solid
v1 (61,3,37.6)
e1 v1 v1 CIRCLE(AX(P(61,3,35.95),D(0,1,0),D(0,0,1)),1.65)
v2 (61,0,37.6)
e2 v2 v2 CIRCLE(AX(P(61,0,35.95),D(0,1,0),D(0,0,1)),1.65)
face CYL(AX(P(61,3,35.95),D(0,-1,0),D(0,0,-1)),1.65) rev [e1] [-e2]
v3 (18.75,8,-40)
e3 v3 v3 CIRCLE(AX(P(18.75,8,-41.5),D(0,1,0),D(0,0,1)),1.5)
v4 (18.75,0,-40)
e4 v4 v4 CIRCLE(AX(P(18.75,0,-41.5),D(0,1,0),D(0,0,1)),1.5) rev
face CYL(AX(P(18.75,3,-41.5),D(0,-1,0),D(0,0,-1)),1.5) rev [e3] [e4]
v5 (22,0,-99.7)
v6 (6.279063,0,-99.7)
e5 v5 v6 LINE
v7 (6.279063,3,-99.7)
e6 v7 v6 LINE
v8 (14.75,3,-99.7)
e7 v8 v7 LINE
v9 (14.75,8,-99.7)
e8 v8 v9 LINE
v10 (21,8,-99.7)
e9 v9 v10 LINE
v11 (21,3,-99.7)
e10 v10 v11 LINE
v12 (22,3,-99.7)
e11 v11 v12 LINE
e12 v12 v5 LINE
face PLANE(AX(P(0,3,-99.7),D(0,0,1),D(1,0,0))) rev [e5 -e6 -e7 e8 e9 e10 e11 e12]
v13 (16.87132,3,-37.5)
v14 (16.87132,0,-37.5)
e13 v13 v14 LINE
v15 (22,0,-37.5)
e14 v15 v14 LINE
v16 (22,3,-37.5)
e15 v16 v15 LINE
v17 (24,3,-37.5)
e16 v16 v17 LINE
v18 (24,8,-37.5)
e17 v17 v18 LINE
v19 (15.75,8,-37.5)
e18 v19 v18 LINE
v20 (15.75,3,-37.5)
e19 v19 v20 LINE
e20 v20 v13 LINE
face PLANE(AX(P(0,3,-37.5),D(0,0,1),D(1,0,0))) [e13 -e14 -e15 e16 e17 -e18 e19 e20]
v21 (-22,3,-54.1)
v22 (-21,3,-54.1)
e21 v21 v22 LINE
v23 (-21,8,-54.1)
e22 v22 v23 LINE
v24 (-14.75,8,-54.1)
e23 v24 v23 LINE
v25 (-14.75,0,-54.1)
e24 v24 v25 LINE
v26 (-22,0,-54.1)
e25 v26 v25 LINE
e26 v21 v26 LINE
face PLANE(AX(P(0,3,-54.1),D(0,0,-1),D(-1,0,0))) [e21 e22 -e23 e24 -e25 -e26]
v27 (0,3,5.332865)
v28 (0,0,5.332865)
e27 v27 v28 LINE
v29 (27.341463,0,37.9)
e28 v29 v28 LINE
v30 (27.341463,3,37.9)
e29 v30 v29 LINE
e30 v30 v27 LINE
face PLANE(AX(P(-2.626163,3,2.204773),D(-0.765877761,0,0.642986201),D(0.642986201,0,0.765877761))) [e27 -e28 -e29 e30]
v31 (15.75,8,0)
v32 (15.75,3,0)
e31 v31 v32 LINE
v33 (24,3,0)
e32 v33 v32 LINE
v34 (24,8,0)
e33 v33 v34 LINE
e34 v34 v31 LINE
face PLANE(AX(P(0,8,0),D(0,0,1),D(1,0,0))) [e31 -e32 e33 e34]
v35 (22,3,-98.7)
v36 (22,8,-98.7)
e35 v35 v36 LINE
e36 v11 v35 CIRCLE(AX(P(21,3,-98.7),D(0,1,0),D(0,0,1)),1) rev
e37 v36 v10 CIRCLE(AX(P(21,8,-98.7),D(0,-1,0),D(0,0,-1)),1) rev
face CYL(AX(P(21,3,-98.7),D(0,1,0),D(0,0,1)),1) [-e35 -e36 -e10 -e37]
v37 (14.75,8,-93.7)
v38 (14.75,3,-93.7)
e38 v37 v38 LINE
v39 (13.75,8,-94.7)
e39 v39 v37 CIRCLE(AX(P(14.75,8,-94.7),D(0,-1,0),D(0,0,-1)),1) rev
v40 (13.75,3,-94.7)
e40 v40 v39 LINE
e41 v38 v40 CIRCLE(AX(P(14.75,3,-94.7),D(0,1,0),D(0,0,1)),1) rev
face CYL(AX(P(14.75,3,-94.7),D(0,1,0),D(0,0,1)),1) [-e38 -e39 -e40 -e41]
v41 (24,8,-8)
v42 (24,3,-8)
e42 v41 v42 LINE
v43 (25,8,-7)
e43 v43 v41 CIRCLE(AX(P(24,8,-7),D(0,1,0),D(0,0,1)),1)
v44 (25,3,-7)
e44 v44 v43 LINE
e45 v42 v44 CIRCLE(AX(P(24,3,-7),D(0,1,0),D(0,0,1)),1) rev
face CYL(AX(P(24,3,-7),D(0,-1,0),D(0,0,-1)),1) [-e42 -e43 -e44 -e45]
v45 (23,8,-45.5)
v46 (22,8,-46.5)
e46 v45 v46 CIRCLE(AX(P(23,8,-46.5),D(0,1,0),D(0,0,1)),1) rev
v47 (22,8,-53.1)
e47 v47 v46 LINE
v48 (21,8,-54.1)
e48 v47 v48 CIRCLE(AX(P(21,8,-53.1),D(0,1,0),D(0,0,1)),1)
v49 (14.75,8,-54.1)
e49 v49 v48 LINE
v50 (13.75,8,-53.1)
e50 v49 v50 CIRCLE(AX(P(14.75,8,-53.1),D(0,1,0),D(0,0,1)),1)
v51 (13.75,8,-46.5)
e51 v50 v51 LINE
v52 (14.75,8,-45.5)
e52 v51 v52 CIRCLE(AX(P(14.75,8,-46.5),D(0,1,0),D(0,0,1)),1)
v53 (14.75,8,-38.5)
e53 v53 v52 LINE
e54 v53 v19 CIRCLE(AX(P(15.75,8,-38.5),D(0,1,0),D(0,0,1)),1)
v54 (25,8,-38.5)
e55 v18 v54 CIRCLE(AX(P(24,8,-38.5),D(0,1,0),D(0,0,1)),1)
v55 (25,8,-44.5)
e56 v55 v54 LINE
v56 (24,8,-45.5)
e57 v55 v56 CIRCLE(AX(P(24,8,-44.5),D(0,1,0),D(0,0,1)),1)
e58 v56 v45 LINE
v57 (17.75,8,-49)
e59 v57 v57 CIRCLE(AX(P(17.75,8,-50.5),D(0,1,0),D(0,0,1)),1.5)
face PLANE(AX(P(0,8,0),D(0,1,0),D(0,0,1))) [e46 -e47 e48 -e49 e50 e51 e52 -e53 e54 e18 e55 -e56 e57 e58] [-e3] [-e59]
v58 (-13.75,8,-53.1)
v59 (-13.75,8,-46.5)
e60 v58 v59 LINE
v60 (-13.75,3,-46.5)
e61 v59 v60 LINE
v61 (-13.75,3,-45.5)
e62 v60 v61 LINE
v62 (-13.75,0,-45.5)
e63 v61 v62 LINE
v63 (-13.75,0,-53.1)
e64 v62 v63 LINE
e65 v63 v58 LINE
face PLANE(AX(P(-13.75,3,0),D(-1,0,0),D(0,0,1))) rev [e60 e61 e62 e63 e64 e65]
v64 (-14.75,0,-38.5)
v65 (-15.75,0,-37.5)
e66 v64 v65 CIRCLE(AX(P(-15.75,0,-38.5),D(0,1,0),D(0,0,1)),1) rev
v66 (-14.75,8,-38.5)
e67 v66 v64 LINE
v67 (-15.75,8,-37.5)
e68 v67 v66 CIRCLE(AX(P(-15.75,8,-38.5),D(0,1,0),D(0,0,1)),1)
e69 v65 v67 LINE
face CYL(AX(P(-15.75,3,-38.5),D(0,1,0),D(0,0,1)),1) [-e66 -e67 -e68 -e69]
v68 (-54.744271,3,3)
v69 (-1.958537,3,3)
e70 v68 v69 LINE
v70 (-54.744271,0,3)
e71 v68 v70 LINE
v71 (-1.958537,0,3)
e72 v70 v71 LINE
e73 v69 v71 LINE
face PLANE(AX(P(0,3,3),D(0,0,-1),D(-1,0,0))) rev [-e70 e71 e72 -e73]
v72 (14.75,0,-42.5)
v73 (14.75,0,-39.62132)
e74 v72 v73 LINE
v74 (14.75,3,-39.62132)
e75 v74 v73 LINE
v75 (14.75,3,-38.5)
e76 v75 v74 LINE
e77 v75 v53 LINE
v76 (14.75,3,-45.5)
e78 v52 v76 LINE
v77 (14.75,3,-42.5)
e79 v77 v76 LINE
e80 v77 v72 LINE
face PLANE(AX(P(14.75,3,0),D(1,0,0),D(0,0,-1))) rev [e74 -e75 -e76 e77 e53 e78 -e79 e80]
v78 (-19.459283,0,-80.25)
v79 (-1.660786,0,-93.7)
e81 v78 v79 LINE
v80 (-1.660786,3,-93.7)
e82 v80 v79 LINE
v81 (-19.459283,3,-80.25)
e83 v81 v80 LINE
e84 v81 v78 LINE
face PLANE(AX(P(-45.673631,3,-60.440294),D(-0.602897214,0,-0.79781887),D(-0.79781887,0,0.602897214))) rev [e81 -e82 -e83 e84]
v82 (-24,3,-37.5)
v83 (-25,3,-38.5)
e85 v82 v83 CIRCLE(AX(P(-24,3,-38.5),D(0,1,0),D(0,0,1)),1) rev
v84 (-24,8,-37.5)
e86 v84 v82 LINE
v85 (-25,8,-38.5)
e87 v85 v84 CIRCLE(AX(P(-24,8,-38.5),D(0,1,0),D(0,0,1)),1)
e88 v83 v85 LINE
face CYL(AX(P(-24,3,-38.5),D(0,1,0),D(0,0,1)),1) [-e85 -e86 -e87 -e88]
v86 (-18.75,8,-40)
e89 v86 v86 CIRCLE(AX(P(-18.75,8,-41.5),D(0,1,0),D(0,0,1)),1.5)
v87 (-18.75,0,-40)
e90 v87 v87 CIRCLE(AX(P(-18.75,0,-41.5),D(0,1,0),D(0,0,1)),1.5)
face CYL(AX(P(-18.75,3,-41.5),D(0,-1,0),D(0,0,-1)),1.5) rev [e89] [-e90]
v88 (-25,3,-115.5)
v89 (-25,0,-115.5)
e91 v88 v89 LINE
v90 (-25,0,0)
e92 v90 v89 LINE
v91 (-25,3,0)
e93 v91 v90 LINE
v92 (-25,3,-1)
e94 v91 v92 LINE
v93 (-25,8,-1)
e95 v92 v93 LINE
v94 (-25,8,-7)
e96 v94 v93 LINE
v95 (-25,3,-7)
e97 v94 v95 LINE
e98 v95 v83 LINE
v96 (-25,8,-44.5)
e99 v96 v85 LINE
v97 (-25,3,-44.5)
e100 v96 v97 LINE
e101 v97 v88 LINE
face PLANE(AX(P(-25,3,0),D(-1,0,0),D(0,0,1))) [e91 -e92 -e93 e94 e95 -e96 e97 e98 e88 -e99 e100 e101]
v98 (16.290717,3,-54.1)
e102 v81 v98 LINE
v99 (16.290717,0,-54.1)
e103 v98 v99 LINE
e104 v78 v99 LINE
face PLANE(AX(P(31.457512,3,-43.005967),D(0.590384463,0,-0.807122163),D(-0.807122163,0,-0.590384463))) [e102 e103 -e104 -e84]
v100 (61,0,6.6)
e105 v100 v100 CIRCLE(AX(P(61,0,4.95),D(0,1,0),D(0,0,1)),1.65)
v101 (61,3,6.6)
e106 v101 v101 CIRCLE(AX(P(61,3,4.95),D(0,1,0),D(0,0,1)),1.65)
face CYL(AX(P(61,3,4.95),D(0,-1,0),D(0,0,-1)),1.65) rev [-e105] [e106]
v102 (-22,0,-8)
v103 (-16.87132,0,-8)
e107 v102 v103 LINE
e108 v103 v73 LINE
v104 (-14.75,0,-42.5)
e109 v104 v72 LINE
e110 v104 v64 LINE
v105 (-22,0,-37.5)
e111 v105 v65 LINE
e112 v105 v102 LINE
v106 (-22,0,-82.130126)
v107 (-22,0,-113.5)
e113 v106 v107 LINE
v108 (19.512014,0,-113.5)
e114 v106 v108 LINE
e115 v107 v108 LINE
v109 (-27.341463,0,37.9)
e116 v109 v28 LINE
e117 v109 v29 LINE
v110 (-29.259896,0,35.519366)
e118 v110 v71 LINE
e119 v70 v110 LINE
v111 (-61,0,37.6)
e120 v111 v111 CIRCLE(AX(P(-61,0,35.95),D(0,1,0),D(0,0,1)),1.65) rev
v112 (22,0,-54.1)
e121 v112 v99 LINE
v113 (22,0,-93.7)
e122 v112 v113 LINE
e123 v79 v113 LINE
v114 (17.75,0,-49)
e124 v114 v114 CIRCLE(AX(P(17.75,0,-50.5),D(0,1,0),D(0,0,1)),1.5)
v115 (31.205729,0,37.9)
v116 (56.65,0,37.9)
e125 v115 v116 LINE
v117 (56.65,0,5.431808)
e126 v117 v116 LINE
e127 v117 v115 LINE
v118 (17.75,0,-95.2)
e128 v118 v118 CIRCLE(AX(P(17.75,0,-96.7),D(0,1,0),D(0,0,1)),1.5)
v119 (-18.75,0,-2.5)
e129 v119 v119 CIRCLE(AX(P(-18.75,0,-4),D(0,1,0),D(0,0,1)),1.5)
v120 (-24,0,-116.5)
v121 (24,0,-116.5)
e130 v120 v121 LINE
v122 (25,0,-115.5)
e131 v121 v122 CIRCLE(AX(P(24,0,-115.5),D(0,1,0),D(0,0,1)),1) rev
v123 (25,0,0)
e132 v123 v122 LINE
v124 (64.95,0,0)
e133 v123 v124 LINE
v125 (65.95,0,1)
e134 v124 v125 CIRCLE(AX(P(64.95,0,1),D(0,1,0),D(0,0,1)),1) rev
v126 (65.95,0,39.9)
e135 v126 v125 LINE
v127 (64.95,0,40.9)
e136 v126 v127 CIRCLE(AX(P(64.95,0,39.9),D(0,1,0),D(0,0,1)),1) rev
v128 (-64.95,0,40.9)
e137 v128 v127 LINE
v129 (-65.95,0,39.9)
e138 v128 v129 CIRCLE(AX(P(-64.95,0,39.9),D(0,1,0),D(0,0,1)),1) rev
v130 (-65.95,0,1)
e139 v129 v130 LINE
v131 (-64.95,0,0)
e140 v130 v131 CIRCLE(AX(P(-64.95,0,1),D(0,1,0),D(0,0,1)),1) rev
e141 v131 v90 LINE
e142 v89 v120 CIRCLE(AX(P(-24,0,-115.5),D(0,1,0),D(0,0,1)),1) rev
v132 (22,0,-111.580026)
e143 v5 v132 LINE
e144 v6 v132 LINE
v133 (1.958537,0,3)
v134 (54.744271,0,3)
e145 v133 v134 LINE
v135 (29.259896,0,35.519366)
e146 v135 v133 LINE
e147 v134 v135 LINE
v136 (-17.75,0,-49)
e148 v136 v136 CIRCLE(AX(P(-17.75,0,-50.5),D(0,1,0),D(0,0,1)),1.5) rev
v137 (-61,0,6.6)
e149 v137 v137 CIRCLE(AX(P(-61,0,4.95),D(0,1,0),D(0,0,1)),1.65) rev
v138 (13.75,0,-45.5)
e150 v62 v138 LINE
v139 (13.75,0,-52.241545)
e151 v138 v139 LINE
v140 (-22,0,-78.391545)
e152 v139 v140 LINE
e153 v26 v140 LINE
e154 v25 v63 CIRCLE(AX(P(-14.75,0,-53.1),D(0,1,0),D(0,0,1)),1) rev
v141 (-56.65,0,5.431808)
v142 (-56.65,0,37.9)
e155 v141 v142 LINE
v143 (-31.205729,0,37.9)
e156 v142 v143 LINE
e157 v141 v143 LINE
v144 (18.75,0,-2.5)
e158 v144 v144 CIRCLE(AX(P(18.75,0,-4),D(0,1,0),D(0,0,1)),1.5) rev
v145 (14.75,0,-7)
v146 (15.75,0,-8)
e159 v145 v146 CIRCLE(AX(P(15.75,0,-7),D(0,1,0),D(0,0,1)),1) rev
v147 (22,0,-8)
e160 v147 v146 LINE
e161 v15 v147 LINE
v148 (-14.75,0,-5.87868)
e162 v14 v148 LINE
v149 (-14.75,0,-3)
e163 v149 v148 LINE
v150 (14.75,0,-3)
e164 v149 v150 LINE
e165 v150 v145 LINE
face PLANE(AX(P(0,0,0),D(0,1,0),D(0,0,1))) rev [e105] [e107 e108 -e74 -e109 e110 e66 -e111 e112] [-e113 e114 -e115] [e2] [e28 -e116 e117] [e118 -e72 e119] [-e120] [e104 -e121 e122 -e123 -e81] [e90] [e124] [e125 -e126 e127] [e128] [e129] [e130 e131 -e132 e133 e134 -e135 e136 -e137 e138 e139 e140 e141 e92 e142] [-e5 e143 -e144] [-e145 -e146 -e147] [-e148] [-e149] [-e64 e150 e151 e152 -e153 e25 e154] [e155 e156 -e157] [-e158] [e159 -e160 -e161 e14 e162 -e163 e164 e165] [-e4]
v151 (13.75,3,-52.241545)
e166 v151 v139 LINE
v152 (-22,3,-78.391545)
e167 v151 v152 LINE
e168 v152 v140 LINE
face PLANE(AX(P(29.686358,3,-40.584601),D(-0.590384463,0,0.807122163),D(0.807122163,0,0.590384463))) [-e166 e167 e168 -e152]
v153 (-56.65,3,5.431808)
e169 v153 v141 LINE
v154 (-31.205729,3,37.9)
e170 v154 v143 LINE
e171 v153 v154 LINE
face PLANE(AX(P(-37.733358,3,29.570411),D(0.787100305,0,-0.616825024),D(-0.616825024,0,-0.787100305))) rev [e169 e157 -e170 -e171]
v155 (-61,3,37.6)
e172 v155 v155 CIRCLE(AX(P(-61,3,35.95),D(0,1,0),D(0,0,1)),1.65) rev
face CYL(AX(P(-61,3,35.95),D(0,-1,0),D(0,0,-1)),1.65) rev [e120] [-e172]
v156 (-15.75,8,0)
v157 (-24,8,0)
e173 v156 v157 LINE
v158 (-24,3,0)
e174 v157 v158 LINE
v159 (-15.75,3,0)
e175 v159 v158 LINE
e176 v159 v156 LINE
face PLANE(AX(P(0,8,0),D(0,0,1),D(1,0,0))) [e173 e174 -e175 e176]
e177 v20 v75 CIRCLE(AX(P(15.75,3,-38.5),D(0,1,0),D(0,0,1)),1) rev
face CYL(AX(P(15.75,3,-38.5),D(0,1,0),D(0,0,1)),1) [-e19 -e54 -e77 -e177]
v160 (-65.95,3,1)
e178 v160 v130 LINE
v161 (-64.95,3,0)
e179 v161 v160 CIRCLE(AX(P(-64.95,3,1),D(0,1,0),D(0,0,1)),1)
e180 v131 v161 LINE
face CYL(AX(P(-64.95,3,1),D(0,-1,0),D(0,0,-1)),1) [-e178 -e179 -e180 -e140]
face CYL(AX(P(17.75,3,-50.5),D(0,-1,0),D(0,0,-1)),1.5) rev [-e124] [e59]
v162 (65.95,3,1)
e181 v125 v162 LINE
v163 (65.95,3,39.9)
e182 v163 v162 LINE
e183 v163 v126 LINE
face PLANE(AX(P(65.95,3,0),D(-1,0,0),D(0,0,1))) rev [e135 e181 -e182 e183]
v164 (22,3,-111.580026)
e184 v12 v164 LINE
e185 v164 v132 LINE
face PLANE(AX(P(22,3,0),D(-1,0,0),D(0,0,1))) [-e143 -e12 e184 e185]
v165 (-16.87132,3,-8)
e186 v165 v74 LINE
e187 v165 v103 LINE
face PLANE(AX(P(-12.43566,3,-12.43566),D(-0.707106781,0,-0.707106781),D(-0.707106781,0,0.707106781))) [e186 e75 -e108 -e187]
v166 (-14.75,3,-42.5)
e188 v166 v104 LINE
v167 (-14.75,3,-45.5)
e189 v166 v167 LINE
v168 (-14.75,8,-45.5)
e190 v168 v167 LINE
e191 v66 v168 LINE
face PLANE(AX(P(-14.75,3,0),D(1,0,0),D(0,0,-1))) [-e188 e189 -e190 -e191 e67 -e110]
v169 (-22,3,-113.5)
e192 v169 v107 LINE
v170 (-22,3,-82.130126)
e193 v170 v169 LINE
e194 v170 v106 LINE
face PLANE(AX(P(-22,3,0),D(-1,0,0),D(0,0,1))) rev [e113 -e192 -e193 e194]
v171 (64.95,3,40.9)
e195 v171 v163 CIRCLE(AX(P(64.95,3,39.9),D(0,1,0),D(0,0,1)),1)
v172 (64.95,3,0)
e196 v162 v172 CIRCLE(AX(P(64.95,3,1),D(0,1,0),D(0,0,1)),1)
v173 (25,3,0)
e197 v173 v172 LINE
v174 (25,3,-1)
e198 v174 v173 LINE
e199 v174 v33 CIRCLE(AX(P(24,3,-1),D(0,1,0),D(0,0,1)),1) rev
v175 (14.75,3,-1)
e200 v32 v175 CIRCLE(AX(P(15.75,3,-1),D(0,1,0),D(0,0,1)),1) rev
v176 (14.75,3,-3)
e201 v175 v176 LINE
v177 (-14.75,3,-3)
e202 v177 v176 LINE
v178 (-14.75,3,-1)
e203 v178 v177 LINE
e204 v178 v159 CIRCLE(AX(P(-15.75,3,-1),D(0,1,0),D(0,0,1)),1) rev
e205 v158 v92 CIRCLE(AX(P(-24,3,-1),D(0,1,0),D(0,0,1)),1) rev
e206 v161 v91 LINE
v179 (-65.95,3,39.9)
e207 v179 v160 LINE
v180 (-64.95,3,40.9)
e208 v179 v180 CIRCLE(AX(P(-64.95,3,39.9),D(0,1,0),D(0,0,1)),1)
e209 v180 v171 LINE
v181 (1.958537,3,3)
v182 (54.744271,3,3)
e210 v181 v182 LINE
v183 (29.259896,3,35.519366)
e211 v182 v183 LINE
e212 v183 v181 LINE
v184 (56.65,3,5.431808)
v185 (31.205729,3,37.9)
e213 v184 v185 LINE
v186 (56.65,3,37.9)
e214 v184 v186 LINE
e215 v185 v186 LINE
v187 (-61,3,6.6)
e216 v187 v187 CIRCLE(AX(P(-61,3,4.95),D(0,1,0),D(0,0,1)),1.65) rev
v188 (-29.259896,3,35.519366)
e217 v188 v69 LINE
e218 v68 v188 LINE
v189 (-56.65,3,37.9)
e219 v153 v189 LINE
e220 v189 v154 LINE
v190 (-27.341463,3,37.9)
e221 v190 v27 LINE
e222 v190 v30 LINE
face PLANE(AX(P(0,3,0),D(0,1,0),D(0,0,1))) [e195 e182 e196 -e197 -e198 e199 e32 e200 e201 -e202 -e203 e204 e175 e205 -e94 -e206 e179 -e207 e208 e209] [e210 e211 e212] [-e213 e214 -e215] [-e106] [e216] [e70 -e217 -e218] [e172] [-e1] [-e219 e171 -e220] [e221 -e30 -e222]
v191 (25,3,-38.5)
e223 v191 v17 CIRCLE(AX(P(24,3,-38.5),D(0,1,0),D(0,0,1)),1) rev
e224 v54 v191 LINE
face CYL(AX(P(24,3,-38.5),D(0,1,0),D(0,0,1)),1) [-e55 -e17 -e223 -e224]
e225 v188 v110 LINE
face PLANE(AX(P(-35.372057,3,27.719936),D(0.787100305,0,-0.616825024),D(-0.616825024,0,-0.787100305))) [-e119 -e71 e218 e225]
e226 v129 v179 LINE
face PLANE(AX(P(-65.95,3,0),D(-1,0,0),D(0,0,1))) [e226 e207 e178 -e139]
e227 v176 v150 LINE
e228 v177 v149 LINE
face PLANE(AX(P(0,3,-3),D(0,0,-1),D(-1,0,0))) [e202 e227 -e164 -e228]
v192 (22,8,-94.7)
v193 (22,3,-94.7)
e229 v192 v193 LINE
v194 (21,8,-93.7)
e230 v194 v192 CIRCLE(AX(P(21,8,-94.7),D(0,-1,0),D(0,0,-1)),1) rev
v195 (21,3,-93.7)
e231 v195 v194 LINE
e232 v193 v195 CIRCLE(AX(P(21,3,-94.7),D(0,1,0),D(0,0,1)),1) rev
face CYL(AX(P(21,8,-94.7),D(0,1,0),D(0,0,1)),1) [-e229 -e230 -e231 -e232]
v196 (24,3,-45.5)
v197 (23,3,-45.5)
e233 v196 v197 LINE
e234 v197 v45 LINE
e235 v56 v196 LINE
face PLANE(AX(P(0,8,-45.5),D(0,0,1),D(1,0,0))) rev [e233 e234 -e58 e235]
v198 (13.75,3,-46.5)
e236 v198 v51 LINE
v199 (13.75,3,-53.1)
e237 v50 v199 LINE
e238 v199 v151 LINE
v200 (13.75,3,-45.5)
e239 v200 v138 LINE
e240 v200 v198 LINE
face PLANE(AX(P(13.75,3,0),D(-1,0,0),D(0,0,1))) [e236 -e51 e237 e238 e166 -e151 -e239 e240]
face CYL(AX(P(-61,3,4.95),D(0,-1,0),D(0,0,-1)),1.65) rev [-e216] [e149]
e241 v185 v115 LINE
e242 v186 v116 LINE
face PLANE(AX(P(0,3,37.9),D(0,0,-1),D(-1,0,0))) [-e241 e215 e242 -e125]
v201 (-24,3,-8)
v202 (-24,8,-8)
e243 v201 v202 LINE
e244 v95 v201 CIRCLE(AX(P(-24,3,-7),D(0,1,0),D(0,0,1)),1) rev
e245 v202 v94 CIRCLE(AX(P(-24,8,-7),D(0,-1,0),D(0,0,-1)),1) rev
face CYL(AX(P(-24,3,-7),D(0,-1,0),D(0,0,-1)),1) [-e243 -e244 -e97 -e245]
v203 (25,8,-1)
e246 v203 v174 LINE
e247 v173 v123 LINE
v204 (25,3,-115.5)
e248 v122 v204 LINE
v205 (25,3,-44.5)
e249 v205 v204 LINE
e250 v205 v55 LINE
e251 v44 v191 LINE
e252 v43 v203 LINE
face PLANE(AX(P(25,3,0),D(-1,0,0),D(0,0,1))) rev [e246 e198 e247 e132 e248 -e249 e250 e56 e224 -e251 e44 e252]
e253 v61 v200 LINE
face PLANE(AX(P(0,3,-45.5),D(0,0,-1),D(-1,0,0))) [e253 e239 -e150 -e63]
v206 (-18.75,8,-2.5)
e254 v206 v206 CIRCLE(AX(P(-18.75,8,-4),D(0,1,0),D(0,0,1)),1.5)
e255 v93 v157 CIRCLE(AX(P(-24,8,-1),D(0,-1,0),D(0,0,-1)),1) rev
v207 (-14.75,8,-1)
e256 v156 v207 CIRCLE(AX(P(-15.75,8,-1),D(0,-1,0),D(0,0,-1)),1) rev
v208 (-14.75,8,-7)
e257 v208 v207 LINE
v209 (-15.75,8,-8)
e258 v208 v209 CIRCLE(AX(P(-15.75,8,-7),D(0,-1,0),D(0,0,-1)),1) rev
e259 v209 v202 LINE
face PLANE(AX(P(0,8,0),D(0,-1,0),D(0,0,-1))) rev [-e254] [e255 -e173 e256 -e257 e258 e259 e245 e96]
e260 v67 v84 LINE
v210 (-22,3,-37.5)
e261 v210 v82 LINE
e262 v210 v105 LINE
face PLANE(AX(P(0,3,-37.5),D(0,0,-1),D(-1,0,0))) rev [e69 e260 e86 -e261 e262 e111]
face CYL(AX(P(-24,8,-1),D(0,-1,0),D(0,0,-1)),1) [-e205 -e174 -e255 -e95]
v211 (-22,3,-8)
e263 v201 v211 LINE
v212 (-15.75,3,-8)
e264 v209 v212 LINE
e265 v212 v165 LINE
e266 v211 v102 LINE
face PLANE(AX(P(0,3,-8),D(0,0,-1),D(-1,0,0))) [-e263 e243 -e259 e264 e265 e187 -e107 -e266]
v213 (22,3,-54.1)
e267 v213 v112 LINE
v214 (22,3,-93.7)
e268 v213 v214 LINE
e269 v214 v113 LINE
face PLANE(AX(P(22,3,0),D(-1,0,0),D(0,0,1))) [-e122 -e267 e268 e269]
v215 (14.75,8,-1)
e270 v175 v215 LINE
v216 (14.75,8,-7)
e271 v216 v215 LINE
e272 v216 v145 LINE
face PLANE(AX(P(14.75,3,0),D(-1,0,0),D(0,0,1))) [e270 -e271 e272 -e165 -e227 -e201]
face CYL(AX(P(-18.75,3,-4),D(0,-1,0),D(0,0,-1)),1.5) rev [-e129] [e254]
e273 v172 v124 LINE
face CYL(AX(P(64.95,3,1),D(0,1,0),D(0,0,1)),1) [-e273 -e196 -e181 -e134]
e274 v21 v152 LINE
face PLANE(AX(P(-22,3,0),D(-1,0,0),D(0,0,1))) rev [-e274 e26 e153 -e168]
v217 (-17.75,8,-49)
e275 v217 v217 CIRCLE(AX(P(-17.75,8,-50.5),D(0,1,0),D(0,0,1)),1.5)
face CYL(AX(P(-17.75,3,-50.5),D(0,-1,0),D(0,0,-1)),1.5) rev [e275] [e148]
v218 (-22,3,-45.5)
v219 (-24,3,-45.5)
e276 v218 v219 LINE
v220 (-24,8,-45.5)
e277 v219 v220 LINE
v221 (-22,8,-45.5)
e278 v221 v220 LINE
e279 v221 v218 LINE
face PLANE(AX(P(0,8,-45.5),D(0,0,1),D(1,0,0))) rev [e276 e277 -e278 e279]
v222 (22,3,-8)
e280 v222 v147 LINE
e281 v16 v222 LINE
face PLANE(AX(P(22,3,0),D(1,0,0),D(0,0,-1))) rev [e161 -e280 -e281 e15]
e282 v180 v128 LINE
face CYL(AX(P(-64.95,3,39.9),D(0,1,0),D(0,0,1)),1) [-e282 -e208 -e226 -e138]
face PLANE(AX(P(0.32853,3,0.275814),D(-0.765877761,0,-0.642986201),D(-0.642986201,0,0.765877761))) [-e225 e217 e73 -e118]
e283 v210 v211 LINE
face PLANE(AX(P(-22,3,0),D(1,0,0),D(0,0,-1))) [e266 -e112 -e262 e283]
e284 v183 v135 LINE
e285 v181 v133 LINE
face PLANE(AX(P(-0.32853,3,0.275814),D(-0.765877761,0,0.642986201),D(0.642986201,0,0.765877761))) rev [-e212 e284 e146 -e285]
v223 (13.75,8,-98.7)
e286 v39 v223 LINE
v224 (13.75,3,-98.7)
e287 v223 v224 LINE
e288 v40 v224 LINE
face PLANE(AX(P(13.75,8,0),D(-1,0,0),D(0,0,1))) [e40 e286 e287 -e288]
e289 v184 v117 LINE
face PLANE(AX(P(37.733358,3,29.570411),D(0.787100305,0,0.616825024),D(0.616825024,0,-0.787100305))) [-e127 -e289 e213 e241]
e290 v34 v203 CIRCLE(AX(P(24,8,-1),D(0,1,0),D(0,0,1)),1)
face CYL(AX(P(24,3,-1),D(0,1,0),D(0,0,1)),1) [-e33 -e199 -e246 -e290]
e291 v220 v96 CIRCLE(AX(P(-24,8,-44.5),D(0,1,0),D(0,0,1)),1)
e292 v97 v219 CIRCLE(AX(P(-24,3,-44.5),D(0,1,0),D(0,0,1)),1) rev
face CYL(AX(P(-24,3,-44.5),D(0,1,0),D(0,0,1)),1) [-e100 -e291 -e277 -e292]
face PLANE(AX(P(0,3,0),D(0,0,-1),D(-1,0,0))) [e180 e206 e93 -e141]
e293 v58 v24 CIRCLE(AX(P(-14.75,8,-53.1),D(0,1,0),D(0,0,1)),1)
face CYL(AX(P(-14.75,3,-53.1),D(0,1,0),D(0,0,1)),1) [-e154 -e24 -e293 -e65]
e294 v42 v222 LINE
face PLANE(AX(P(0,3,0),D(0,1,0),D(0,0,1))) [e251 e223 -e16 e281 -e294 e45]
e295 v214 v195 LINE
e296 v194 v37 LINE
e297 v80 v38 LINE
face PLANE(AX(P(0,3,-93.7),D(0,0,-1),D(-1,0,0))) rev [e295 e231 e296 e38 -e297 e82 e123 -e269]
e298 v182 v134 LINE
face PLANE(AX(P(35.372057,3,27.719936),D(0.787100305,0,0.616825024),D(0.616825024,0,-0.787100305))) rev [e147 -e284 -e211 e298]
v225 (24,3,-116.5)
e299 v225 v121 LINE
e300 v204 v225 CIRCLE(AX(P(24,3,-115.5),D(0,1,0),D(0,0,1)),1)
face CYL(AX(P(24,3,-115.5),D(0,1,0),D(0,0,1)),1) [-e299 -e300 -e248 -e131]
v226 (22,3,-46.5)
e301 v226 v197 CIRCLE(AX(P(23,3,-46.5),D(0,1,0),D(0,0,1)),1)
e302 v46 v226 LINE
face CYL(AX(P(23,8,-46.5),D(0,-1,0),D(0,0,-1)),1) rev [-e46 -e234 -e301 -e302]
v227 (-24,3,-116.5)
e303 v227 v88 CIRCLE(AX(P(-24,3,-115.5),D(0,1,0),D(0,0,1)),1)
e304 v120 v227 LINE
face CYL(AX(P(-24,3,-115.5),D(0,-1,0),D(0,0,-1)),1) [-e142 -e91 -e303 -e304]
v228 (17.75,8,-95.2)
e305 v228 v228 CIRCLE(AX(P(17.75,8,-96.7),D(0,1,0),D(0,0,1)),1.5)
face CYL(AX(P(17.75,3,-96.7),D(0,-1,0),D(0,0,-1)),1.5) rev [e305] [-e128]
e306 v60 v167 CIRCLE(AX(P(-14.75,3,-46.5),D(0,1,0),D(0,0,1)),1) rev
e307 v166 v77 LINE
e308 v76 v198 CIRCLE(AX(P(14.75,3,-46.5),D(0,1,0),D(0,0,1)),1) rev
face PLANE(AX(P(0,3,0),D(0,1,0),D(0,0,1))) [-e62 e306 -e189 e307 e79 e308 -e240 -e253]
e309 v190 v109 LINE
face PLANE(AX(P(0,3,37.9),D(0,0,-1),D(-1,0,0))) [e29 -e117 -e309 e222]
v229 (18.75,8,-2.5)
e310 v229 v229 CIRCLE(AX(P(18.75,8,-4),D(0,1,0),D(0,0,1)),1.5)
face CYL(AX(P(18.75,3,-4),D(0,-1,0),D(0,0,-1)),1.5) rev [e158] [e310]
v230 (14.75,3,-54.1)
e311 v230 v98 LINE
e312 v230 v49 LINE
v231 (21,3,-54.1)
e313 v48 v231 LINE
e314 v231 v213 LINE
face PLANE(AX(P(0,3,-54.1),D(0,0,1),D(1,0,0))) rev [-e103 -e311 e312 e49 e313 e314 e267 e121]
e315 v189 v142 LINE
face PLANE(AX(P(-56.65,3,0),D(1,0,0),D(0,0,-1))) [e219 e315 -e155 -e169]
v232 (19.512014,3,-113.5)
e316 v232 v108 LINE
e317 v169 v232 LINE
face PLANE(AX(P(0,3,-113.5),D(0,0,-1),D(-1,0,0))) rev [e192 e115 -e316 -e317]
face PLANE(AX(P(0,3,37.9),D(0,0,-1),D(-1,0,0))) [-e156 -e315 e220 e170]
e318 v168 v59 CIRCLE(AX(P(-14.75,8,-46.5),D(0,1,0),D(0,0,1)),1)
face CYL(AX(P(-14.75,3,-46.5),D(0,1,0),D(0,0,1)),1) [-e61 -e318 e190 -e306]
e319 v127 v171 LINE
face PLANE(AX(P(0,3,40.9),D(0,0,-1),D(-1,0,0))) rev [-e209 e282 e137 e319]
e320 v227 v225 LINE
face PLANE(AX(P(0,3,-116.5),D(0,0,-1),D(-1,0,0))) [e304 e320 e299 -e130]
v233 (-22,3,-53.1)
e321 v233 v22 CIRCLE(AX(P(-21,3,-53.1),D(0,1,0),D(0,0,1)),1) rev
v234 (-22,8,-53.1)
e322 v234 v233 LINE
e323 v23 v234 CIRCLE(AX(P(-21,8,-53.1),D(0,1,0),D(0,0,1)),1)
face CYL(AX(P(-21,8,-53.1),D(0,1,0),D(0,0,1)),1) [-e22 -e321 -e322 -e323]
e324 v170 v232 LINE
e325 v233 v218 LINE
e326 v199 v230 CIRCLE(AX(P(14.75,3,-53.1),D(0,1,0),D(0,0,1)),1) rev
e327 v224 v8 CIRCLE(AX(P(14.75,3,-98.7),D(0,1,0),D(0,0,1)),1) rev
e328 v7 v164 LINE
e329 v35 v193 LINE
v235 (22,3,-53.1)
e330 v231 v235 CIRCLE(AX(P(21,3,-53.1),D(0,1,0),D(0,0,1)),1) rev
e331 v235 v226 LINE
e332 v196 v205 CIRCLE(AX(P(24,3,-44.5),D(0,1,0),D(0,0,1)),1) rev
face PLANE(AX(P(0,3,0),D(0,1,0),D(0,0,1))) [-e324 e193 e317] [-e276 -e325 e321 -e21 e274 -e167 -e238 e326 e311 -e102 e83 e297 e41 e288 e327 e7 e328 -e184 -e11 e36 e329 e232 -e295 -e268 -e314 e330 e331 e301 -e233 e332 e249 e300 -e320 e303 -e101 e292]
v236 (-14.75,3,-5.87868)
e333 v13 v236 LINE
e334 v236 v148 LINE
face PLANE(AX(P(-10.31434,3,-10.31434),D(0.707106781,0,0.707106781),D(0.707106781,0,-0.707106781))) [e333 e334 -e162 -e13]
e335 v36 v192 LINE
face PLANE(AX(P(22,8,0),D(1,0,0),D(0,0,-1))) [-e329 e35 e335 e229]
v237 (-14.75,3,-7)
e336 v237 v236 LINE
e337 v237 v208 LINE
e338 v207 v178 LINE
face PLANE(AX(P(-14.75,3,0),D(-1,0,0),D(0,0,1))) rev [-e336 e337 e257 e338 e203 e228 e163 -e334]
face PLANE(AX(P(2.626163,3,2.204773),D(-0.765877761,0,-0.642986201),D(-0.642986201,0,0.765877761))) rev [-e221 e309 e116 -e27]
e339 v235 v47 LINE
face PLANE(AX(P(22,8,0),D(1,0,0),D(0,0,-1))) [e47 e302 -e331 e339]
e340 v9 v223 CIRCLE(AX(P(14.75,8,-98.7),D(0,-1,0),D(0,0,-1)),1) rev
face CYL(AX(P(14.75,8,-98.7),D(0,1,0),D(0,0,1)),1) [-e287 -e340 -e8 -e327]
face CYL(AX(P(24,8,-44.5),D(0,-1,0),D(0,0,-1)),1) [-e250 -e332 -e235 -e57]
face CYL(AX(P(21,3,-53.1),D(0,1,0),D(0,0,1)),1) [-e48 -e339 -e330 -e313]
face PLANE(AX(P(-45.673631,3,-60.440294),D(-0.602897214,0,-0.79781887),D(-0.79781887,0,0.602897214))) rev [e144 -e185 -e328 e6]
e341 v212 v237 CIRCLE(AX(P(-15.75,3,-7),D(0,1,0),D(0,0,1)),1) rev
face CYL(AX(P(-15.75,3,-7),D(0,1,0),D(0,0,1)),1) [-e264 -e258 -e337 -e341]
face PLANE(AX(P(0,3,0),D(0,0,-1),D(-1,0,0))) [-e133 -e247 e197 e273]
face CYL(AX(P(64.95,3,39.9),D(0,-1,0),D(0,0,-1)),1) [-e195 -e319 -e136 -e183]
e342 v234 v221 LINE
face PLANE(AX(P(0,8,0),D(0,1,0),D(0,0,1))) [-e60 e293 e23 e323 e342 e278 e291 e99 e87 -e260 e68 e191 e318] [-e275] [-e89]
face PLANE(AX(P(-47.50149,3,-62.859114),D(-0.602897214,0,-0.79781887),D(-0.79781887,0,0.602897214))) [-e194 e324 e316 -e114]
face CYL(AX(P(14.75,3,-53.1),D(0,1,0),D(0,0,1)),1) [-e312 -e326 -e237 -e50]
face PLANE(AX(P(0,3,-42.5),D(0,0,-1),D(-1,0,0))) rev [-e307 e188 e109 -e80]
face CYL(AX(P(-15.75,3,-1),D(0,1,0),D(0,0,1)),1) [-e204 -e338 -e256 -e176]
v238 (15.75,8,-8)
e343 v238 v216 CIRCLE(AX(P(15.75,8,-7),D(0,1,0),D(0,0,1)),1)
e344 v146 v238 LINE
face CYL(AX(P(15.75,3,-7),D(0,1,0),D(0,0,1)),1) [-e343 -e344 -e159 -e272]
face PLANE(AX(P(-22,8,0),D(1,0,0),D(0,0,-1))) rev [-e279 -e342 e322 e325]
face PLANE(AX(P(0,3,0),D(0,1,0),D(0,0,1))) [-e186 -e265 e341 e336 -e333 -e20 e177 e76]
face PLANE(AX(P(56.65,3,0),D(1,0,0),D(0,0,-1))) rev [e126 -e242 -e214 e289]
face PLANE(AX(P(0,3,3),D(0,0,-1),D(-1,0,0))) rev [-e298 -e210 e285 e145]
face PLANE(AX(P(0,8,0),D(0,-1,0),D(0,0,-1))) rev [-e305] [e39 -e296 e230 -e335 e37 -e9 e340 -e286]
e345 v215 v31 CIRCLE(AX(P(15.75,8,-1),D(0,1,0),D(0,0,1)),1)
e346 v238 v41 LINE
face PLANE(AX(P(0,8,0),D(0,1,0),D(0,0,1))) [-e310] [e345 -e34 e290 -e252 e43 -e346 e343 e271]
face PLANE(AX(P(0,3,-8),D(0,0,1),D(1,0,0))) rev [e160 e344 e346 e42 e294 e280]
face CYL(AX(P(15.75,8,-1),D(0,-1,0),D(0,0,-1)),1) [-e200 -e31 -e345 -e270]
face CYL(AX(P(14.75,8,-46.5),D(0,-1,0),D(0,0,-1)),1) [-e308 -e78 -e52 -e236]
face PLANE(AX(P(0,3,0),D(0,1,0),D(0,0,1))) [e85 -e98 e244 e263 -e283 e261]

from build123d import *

# Parameters (mm, degrees)
SKETCH1_R           = 1.65
SKETCH1_W           = 29.5
SKETCH1_H           = 3
SKETCH1_R_2         = 1.5
SKETCH1_W_2         = 3
SKETCH1_H_2         = 29.5
SKETCH1_H_3         = 8.6
SKETCH1_W_3         = 8.25
SKETCH1_H_4         = 6
SKETCH1_H_5         = 1.5
BOSS_EXTRUDE1_DEPTH = 3
BOSS_EXTRUDE2_START = 3
SKETCH1_5_R         = 1.5
SKETCH1_5_W         = 8.25
SKETCH1_5_H         = 6
BOSS_EXTRUDE2_DEPTH = 5
FILLET1_R           = 1


with BuildPart() as part:
    # Sketch1 → Boss-Extrude1 (new body)
    # profile 1 of 27: a face of its own
    with BuildSketch(Plane(origin=(0, 0, 0), x_dir=(1, 0, 0), z_dir=(0, 1, 0))):
        Polygon((-56.65, -37.9), (-56.65, -40.9), (56.65, -40.9), (56.65, -37.9), (31.205729157, -37.9), (27.341462913, -37.9), (-27.341462913, -37.9), (-31.205729157, -37.9), align=None)
    # profile 2 of 27: a face of its own
    with BuildSketch(Plane(origin=(0, 0, 0), x_dir=(1, 0, 0), z_dir=(0, 1, 0))):
        Polygon((-65.95, 0), (-65.95, -40.9), (-56.65, -40.9), (-56.65, -37.9), (-56.65, -5.431807955), (-56.65, -3), (-56.65, 0), align=None)
        with Locations(Location((-61, -35.95, 0), (0, 0, 270))):
            Circle(SKETCH1_R, mode=Mode.SUBTRACT)
        with Locations(Location((-61, -4.95, 0), (0, 0, 270))):
            Circle(SKETCH1_R, mode=Mode.SUBTRACT)
    # profile 3 of 27: a face of its own
    with BuildSketch(Plane(origin=(0, 0, 0), x_dir=(1, 0, 0), z_dir=(0, 1, 0))):
        Polygon((-56.65, -3), (-56.65, -5.431807955), (-31.205729157, -37.9), (-27.341462913, -37.9), (0, -5.332864995), (27.341462913, -37.9), (31.205729157, -37.9), (56.65, -5.431807955), (56.65, -3), (54.744270843, -3), (29.259896294, -35.519366427), (1.958537087, -3), (-1.958537087, -3), (-29.259896294, -35.519366427), (-54.744270843, -3), align=None)
    # profile 4 of 27: a face of its own
    with BuildSketch(Plane(origin=(0, 0, 0), x_dir=(1, 0, 0), z_dir=(0, 1, 0))):
        Polygon((56.65, -37.9), (56.65, -40.9), (65.95, -40.9), (65.95, 0), (56.65, 0), (56.65, -3), (56.65, -5.431807955), align=None)
        with Locations(Location((61, -35.95, 0), (0, 0, 270))):
            Circle(SKETCH1_R, mode=Mode.SUBTRACT)
        with Locations(Location((61, -4.95, 0), (0, 0, 270))):
            Circle(SKETCH1_R, mode=Mode.SUBTRACT)
    # profile 5 of 27: a face of its own
    with BuildSketch(Plane(origin=(0, 0, 0), x_dir=(1, 0, 0), z_dir=(0, 1, 0))):
        Polygon((-25, 0), (-56.65, 0), (-56.65, -3), (-54.744270843, -3), (-1.958537087, -3), (1.958537087, -3), (54.744270843, -3), (56.65, -3), (56.65, 0), (25, 0), (14.75, 0), (-14.75, 0), align=None)
    # profile 6 of 27: a face of its own
    with BuildSketch(Plane(origin=(0, 0, 0), x_dir=(1, 0, 0), z_dir=(0, 1, 0))):
        with Locations((0, 1.5)):
            Rectangle(SKETCH1_W, SKETCH1_H)
    # profile 7 of 27: a face of its own
    with BuildSketch(Plane(origin=(0, 0, 0), x_dir=(1, 0, 0), z_dir=(0, 1, 0))):
        Polygon((14.75, 3), (14.75, 0), (25, 0), (25, 8), (22, 8), (14.75, 8), align=None)
        with Locations(Location((18.75, 4, 0), (0, 0, 270))):
            Circle(SKETCH1_R_2, mode=Mode.SUBTRACT)
    # profile 8 of 27: a face of its own
    with BuildSketch(Plane(origin=(0, 0, 0), x_dir=(1, 0, 0), z_dir=(0, 1, 0))):
        Polygon((-25, 8), (-25, 0), (-14.75, 0), (-14.75, 3), (-14.75, 5.878679656), (-14.75, 8), (-16.871320344, 8), (-22, 8), align=None)
        with Locations(Location((-18.75, 4, 0), (0, 0, 270))):
            Circle(SKETCH1_R_2, mode=Mode.SUBTRACT)
    # profile 9 of 27: a face of its own
    with BuildSketch(Plane(origin=(0, 0, 0), x_dir=(1, 0, 0), z_dir=(0, 1, 0))):
        with Locations((23.5, 22.75)):
            Rectangle(SKETCH1_W_2, SKETCH1_H_2)
    # profile 10 of 27: a face of its own
    with BuildSketch(Plane(origin=(0, 0, 0), x_dir=(1, 0, 0), z_dir=(0, 1, 0))):
        Polygon((-14.75, 8), (-14.75, 5.878679656), (16.871320344, 37.5), (14.75, 37.5), (14.75, 39.621320344), (-16.871320344, 8), align=None)
    # profile 11 of 27: a face of its own
    with BuildSketch(Plane(origin=(0, 0, 0), x_dir=(1, 0, 0), z_dir=(0, 1, 0))):
        with Locations((-23.5, 22.75)):
            Rectangle(SKETCH1_W_2, SKETCH1_H_2)
    # profile 12 of 27: a face of its own
    with BuildSketch(Plane(origin=(0, 0, 0), x_dir=(1, 0, 0), z_dir=(0, 1, 0))):
        Polygon((14.75, 37.5), (16.871320344, 37.5), (22, 37.5), (25, 37.5), (25, 45.5), (22, 45.5), (14.75, 45.5), (14.75, 42.5), (14.75, 39.621320344), align=None)
        with Locations(Location((18.75, 41.5, 0), (0, 0, 270))):
            Circle(SKETCH1_R_2, mode=Mode.SUBTRACT)
    # profile 13 of 27: a face of its own
    with BuildSketch(Plane(origin=(0, 0, 0), x_dir=(1, 0, 0), z_dir=(0, 1, 0))):
        Polygon((-13.75, 45.5), (-14.75, 45.5), (-14.75, 42.5), (14.75, 42.5), (14.75, 45.5), (13.75, 45.5), align=None)
    # profile 14 of 27: a face of its own
    with BuildSketch(Plane(origin=(0, 0, 0), x_dir=(1, 0, 0), z_dir=(0, 1, 0))):
        Polygon((-25, 45.5), (-25, 37.5), (-22, 37.5), (-14.75, 37.5), (-14.75, 42.5), (-14.75, 45.5), (-22, 45.5), align=None)
        with Locations(Location((-18.75, 41.5, 0), (0, 0, 270))):
            Circle(SKETCH1_R_2, mode=Mode.SUBTRACT)
    # profile 15 of 27: a face of its own
    with BuildSketch(Plane(origin=(0, 0, 0), x_dir=(1, 0, 0), z_dir=(0, 1, 0))):
        Polygon((-22, 54.1), (-22, 45.5), (-14.75, 45.5), (-13.75, 45.5), (-13.75, 54.1), align=None)
        with Locations(Location((-17.75, 50.5, 0), (0, 0, 270))):
            Circle(SKETCH1_R_2, mode=Mode.SUBTRACT)
    # profile 16 of 27: a face of its own
    with BuildSketch(Plane(origin=(0, 0, 0), x_dir=(1, 0, 0), z_dir=(0, 1, 0))):
        with Locations((-23.5, 49.8)):
            Rectangle(SKETCH1_W_2, SKETCH1_H_3)
    # profile 17 of 27: a face of its own
    with BuildSketch(Plane(origin=(0, 0, 0), x_dir=(1, 0, 0), z_dir=(0, 1, 0))):
        Polygon((13.75, 45.5), (14.75, 45.5), (22, 45.5), (22, 54.1), (16.290717268, 54.1), (13.75, 54.1), (13.75, 52.241545271), align=None)
        with Locations(Location((17.75, 50.5, 0), (0, 0, 270))):
            Circle(SKETCH1_R_2, mode=Mode.SUBTRACT)
    # profile 18 of 27: a face of its own
    with BuildSketch(Plane(origin=(0, 0, 0), x_dir=(1, 0, 0), z_dir=(0, 1, 0))):
        with Locations((23.5, 49.8)):
            Rectangle(SKETCH1_W_2, SKETCH1_H_3)
    # profile 19 of 27: a face of its own
    with BuildSketch(Plane(origin=(0, 0, 0), x_dir=(1, 0, 0), z_dir=(0, 1, 0))):
        Polygon((-22, 82.130125999), (-22, 78.391545271), (13.75, 52.241545271), (13.75, 54.1), (16.290717268, 54.1), (-19.459282732, 80.25), (-1.660786492, 93.7), (6.279063132, 99.7), (22, 111.580026156), (22, 113.5), (19.512013715, 113.5), align=None)
    # profile 20 of 27: a face of its own
    with BuildSketch(Plane(origin=(0, 0, 0), x_dir=(1, 0, 0), z_dir=(0, 1, 0))):
        Polygon((22, 54.1), (25, 54.1), (25, 113.5), (22, 113.5), (22, 111.580026156), (22, 99.7), (22, 93.7), align=None)
    # profile 21 of 27: a face of its own
    with BuildSketch(Plane(origin=(0, 0, 0), x_dir=(1, 0, 0), z_dir=(0, 1, 0))):
        Polygon((-25, 113.5), (-25, 54.1), (-22, 54.1), (-22, 78.391545271), (-22, 82.130125999), (-22, 113.5), align=None)
    # profile 22 of 27: a face of its own
    with BuildSketch(Plane(origin=(0, 0, 0), x_dir=(1, 0, 0), z_dir=(0, 1, 0))):
        Polygon((-1.660786492, 93.7), (13.75, 93.7), (13.75, 99.7), (6.279063132, 99.7), align=None)
    # profile 23 of 27: a face of its own
    with BuildSketch(Plane(origin=(0, 0, 0), x_dir=(1, 0, 0), z_dir=(0, 1, 0))):
        with Locations((17.875, 96.7)):
            Rectangle(SKETCH1_W_3, SKETCH1_H_4)
        with Locations(Location((17.75, 96.7, 0), (0, 0, 270))):
            Circle(SKETCH1_R_2, mode=Mode.SUBTRACT)
    # profile 24 of 27: a face of its own
    with BuildSketch(Plane(origin=(0, 0, 0), x_dir=(1, 0, 0), z_dir=(0, 1, 0))):
        Polygon((-22, 115), (-22, 113.5), (19.512013715, 113.5), (22, 113.5), (22, 115), align=None)
    # profile 25 of 27: a face of its own
    with BuildSketch(Plane(origin=(0, 0, 0), x_dir=(1, 0, 0), z_dir=(0, 1, 0))):
        Polygon((-25, 116.5), (-25, 115), (-22, 115), (22, 115), (25, 115), (25, 116.5), align=None)
    # profile 26 of 27: a face of its own
    with BuildSketch(Plane(origin=(0, 0, 0), x_dir=(1, 0, 0), z_dir=(0, 1, 0))):
        with Locations((23.5, 114.25)):
            Rectangle(SKETCH1_W_2, SKETCH1_H_5)
    # profile 27 of 27: a face of its own
    with BuildSketch(Plane(origin=(0, 0, 0), x_dir=(1, 0, 0), z_dir=(0, 1, 0))):
        with Locations((-23.5, 114.25)):
            Rectangle(SKETCH1_W_2, SKETCH1_H_5)
    extrude(amount=BOSS_EXTRUDE1_DEPTH)

    # Sketch1<5> → Boss-Extrude2 (add)
    # profile 1 of 7: a face of its own
    with BuildSketch(Plane(origin=(0, 0, 0), x_dir=(1, 0, 0), z_dir=(0, 1, 0)).offset(BOSS_EXTRUDE2_START)):
        Polygon((14.75, 3), (14.75, 0), (25, 0), (25, 8), (22, 8), (14.75, 8), align=None)
        with Locations(Location((18.75, 4, 0), (0, 0, 270))):
            Circle(SKETCH1_5_R, mode=Mode.SUBTRACT)
    # profile 2 of 7: a face of its own
    with BuildSketch(Plane(origin=(0, 0, 0), x_dir=(1, 0, 0), z_dir=(0, 1, 0)).offset(BOSS_EXTRUDE2_START)):
        Polygon((-25, 8), (-25, 0), (-14.75, 0), (-14.75, 3), (-14.75, 5.878679656), (-14.75, 8), (-16.871320344, 8), (-22, 8), align=None)
        with Locations(Location((-18.75, 4, 0), (0, 0, 270))):
            Circle(SKETCH1_5_R, mode=Mode.SUBTRACT)
    # profile 3 of 7: a face of its own
    with BuildSketch(Plane(origin=(0, 0, 0), x_dir=(1, 0, 0), z_dir=(0, 1, 0)).offset(BOSS_EXTRUDE2_START)):
        Polygon((14.75, 37.5), (16.871320344, 37.5), (22, 37.5), (25, 37.5), (25, 45.5), (22, 45.5), (14.75, 45.5), (14.75, 42.5), (14.75, 39.621320344), align=None)
        with Locations(Location((18.75, 41.5, 0), (0, 0, 270))):
            Circle(SKETCH1_5_R, mode=Mode.SUBTRACT)
    # profile 4 of 7: a face of its own
    with BuildSketch(Plane(origin=(0, 0, 0), x_dir=(1, 0, 0), z_dir=(0, 1, 0)).offset(BOSS_EXTRUDE2_START)):
        Polygon((-25, 45.5), (-25, 37.5), (-22, 37.5), (-14.75, 37.5), (-14.75, 42.5), (-14.75, 45.5), (-22, 45.5), align=None)
        with Locations(Location((-18.75, 41.5, 0), (0, 0, 270))):
            Circle(SKETCH1_5_R, mode=Mode.SUBTRACT)
    # profile 5 of 7: a face of its own
    with BuildSketch(Plane(origin=(0, 0, 0), x_dir=(1, 0, 0), z_dir=(0, 1, 0)).offset(BOSS_EXTRUDE2_START)):
        Polygon((13.75, 45.5), (14.75, 45.5), (22, 45.5), (22, 54.1), (16.290717268, 54.1), (13.75, 54.1), (13.75, 52.241545271), align=None)
        with Locations(Location((17.75, 50.5, 0), (0, 0, 270))):
            Circle(SKETCH1_5_R, mode=Mode.SUBTRACT)
    # profile 6 of 7: a face of its own
    with BuildSketch(Plane(origin=(0, 0, 0), x_dir=(1, 0, 0), z_dir=(0, 1, 0)).offset(BOSS_EXTRUDE2_START)):
        Polygon((-22, 54.1), (-22, 45.5), (-14.75, 45.5), (-13.75, 45.5), (-13.75, 54.1), align=None)
        with Locations(Location((-17.75, 50.5, 0), (0, 0, 270))):
            Circle(SKETCH1_5_R, mode=Mode.SUBTRACT)
    # profile 7 of 7: a face of its own
    with BuildSketch(Plane(origin=(0, 0, 0), x_dir=(1, 0, 0), z_dir=(0, 1, 0)).offset(BOSS_EXTRUDE2_START)):
        with Locations((17.875, 96.7)):
            Rectangle(SKETCH1_5_W, SKETCH1_5_H)
        with Locations(Location((17.75, 96.7, 0), (0, 0, 270))):
            Circle(SKETCH1_5_R, mode=Mode.SUBTRACT)
    extrude(amount=BOSS_EXTRUDE2_DEPTH)

    # Fillet1
    fillet1_edges = [part.edges().sort_by_distance(p)[0] for p in [
        (14.75, 4, -8),
        (-14.75, 4, -37.5),
        (-13.75, 4, -54.1),
        (65.95, 1.5, 0),
        (65.95, 1.5, 40.9),
        (-65.95, 1.5, 40.9),
        (-65.95, 1.5, 0),
        (-25, 1.5, -116.5),
        (25, 1.5, -116.5),
        (14.75, 5.5, 0),
        (25, 5.5, 0),
        (25, 5.5, -8),
        (-25, 5.5, -8),
        (-25, 5.5, 0),
        (-14.75, 5.5, 0),
        (-14.75, 5.5, -8),
        (13.75, 5.5, -45.5),
        (14.75, 5.5, -37.5),
        (25, 5.5, -37.5),
        (25, 5.5, -45.5),
        (22, 5.5, -45.5),
        (22, 5.5, -54.1),
        (13.75, 5.5, -54.1),
        (-13.75, 5.5, -45.5),
        (-22, 5.5, -54.1),
        (-25, 5.5, -45.5),
        (-25, 5.5, -37.5),
        (13.75, 5.5, -93.7),
        (22, 5.5, -93.7),
        (22, 5.5, -99.7),
        (13.75, 5.5, -99.7),
    ]]
    fillet(fillet1_edges, radius=FILLET1_R - 0.0001)  # a hair under: the kernel refuses the full size


solid = part.part
